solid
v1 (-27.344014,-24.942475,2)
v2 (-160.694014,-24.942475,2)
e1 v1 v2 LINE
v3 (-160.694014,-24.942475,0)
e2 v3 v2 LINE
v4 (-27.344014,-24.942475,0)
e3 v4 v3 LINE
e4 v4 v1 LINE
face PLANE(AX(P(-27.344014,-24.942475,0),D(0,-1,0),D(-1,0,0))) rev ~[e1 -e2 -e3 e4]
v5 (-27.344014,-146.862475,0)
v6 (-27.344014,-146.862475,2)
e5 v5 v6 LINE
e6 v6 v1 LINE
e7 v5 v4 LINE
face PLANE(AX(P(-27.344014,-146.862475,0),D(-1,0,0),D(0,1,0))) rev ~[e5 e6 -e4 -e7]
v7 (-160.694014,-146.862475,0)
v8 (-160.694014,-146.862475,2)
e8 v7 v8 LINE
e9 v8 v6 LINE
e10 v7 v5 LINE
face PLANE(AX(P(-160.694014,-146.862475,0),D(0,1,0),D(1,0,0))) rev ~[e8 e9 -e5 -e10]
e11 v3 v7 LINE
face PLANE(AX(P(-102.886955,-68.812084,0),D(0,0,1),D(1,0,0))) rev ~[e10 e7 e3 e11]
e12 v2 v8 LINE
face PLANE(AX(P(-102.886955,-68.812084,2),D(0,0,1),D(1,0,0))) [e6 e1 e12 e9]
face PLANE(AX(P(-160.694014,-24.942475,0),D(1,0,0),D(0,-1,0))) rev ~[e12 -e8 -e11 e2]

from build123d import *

# Parameters (mm, degrees)
F0_W     = 15
F0_H     = 10
F1_DEPTH = 2


with BuildPart() as f1:
    # F0 (on Top) → F1 (new body)
    with BuildSketch(Plane.XY):
        with BuildLine():
            Line((-79.005146173, -24.942474779), (-129.3440142274, -24.942474779))
            Line((-129.3440142274, -24.942474779), (-129.3440142274, -27.456315279))
            Line((-129.3440142274, -27.456315279), (-128.3440142274, -27.456315279))
            ThreePointArc((-128.3440142274, -27.456315279), (-126.3440142274, -25.456315279), (-124.3440142274, -27.456315279))
            ThreePointArc((-124.3440142274, -27.456315279), (-124.929800665, -28.8705288414), (-126.3440142274, -29.456315279))
            Line((-126.3440142274, -29.456315279), (-126.3440142274, -106.756315279))
            ThreePointArc((-126.3440142274, -106.756315279), (-124.929800665, -107.3421017166), (-124.3440142274, -108.756315279))
            ThreePointArc((-124.3440142274, -108.756315279), (-124.929800665, -110.1705288414), (-126.3440142274, -110.756315279))
            Line((-126.3440142274, -110.756315279), (-126.3440142274, -114.756315279))
            Line((-126.3440142274, -114.756315279), (-77.3440142274, -114.756315279))
            Line((-77.3440142274, -114.756315279), (-77.3440142274, -105.156315279))
            ThreePointArc((-77.3440142274, -105.156315279), (-79.3440142274, -103.156315279), (-77.3440142274, -101.156315279))
            Line((-77.3440142274, -101.156315279), (-77.3440142274, -28.056315279))
            ThreePointArc((-77.3440142274, -28.056315279), (-79.1086219742, -26.9976757307), (-79.005146173, -24.942474779))
        make_face()
        Polygon((-129.3440142274, -27.456315279), (-129.3440142274, -24.942474779), (-139.4949736476, -24.942474779), (-139.4949736476, -128.856315279), (-139.4949736476, -132.256315279), (-139.3440142274, -142.256315279), (-129.3440142274, -142.256315279), (-129.3440142274, -124.756315279), (-134.3440142274, -124.756315279), (-139.1930548072, -124.756315279), (-139.3440142274, -124.756315279), (-139.3440142274, -119.756315279), (-139.3440142274, -114.756315279), (-129.3440142274, -114.756315279), (-129.3440142274, -111.756315279), (-129.3440142274, -108.756315279), (-129.3440142274, -27.956315279), align=None)
        with BuildLine():
            Line((-139.4949736476, -128.856315279), (-139.4949736476, -24.942474779))
            Line((-139.4949736476, -24.942474779), (-160.6940142274, -24.942474779))
            Line((-160.6940142274, -24.942474779), (-160.6940142274, -132.256315279))
            Line((-160.6940142274, -132.256315279), (-142.7440142274, -132.256315279))
            Line((-142.7440142274, -132.256315279), (-142.7440142274, -130.256315279))
            ThreePointArc((-142.7440142274, -130.256315279), (-143.7339637211, -127.8663657853), (-141.3440142274, -128.856315279))
            Line((-141.3440142274, -128.856315279), (-139.4949736476, -128.856315279))
        make_face()
        with BuildLine():
            Line((-128.3440142274, -27.456315279), (-129.3440142274, -27.456315279))
            Line((-129.3440142274, -27.456315279), (-129.3440142274, -27.956315279))
            Line((-129.3440142274, -27.956315279), (-129.3440142274, -108.756315279))
            Line((-129.3440142274, -108.756315279), (-128.3440142274, -108.756315279))
            ThreePointArc((-128.3440142274, -108.756315279), (-127.7582277898, -107.3421017166), (-126.3440142274, -106.756315279))
            Line((-126.3440142274, -106.756315279), (-126.3440142274, -29.456315279))
            ThreePointArc((-126.3440142274, -29.456315279), (-127.7582277898, -28.8705288414), (-128.3440142274, -27.456315279))
        make_face()
        with BuildLine():
            Line((-75.6828822818, -24.942474779), (-79.005146173, -24.942474779))
            ThreePointArc((-79.005146173, -24.942474779), (-79.1086219742, -26.9976757307), (-77.3440142274, -28.056315279))
            Line((-77.3440142274, -28.056315279), (-77.3440142274, -26.056315279))
            Line((-77.3440142274, -26.056315279), (-75.3440142274, -26.056315279))
            ThreePointArc((-75.3440142274, -26.056315279), (-75.4306057646, -25.4741915341), (-75.6828822818, -24.942474779))
        make_face()
        with BuildLine():
            Line((-139.4949736476, -132.256315279), (-139.4949736476, -128.856315279))
            Line((-139.4949736476, -128.856315279), (-141.3440142274, -128.856315279))
            ThreePointArc((-141.3440142274, -128.856315279), (-141.7540647337, -129.8462647727), (-142.7440142274, -130.256315279))
            Line((-142.7440142274, -130.256315279), (-142.7440142274, -132.256315279))
            Line((-142.7440142274, -132.256315279), (-139.4949736476, -132.256315279))
        make_face()
        Polygon((-142.7440142274, -132.256315279), (-160.6940142274, -132.256315279), (-160.6940142274, -142.256315279), (-139.3440142274, -142.256315279), (-139.4949736476, -132.256315279), align=None)
        Polygon((-139.3440142274, -142.256315279), (-160.6940142274, -142.256315279), (-160.6940142274, -146.862474779), (-27.3440142274, -146.862474779), (-27.3440142274, -124.756315279), (-32.3440142274, -124.756315279), (-37.3440142274, -124.756315279), (-74.3440142274, -124.756315279), (-74.3440142274, -142.256315279), (-77.3440142274, -142.256315279), (-129.3440142274, -142.256315279), align=None)
        with BuildLine():
            ThreePointArc((-124.3440142274, -27.456315279), (-126.3440142274, -25.456315279), (-128.3440142274, -27.456315279))
            Line((-128.3440142274, -27.456315279), (-126.3440142274, -27.456315279))
            Line((-126.3440142274, -27.456315279), (-126.3440142274, -29.456315279))
            ThreePointArc((-126.3440142274, -29.456315279), (-124.929800665, -28.8705288414), (-124.3440142274, -27.456315279))
        make_face()
        with BuildLine():
            Line((-126.3440142274, -27.456315279), (-128.3440142274, -27.456315279))
            ThreePointArc((-128.3440142274, -27.456315279), (-127.7582277898, -28.8705288414), (-126.3440142274, -29.456315279))
            Line((-126.3440142274, -29.456315279), (-126.3440142274, -27.456315279))
        make_face()
        with BuildLine():
            Line((-74.3440142274, -24.942474779), (-75.6828822818, -24.942474779))
            ThreePointArc((-75.6828822818, -24.942474779), (-75.4306057646, -25.4741915341), (-75.3440142274, -26.056315279))
            Line((-75.3440142274, -26.056315279), (-74.3440142274, -26.056315279))
            Line((-74.3440142274, -26.056315279), (-74.3440142274, -24.942474779))
        make_face()
        with BuildLine():
            ThreePointArc((-75.3440142274, -26.056315279), (-75.929800665, -27.4705288414), (-77.3440142274, -28.056315279))
            Line((-77.3440142274, -28.056315279), (-77.3440142274, -101.156315279))
            ThreePointArc((-77.3440142274, -101.156315279), (-75.929800665, -101.7421017166), (-75.3440142274, -103.156315279))
            Line((-75.3440142274, -103.156315279), (-74.3440142274, -103.156315279))
            Line((-74.3440142274, -103.156315279), (-74.3440142274, -26.056315279))
            Line((-74.3440142274, -26.056315279), (-75.3440142274, -26.056315279))
        make_face()
        with BuildLine():
            Line((-77.3440142274, -26.056315279), (-77.3440142274, -28.056315279))
            ThreePointArc((-77.3440142274, -28.056315279), (-75.929800665, -27.4705288414), (-75.3440142274, -26.056315279))
            Line((-75.3440142274, -26.056315279), (-77.3440142274, -26.056315279))
        make_face()
        with BuildLine():
            Line((-142.7440142274, -128.856315279), (-141.3440142274, -128.856315279))
            ThreePointArc((-141.3440142274, -128.856315279), (-143.7339637211, -127.8663657853), (-142.7440142274, -130.256315279))
            Line((-142.7440142274, -130.256315279), (-142.7440142274, -128.856315279))
        make_face()
        with BuildLine():
            ThreePointArc((-142.7440142274, -130.256315279), (-141.7540647337, -129.8462647727), (-141.3440142274, -128.856315279))
            Line((-141.3440142274, -128.856315279), (-142.7440142274, -128.856315279))
            Line((-142.7440142274, -128.856315279), (-142.7440142274, -130.256315279))
        make_face()
        with BuildLine():
            Line((-128.3440142274, -108.756315279), (-129.3440142274, -108.756315279))
            Line((-129.3440142274, -108.756315279), (-129.3440142274, -111.756315279))
            Line((-129.3440142274, -111.756315279), (-129.3440142274, -114.756315279))
            Line((-129.3440142274, -114.756315279), (-126.3440142274, -114.756315279))
            Line((-126.3440142274, -114.756315279), (-126.3440142274, -110.756315279))
            ThreePointArc((-126.3440142274, -110.756315279), (-127.7582277898, -110.1705288414), (-128.3440142274, -108.756315279))
        make_face()
        Polygon((-64.3440142274, -24.942474779), (-74.3440142274, -24.942474779), (-74.3440142274, -26.056315279), (-74.3440142274, -103.156315279), (-74.3440142274, -111.906315279), (-74.3440142274, -114.756315279), (-64.3440142274, -114.756315279), (-64.3440142274, -112.806315279), (-64.3440142274, -82.706315279), (-64.3440142274, -80.756315279), (-64.3440142274, -60.756315279), (-64.3440142274, -59.006315279), (-64.3440142274, -26.456315279), align=None)
        with BuildLine():
            ThreePointArc((-75.3440142274, -103.156315279), (-75.929800665, -101.7421017166), (-77.3440142274, -101.156315279))
            Line((-77.3440142274, -101.156315279), (-77.3440142274, -103.156315279))
            Line((-77.3440142274, -103.156315279), (-75.3440142274, -103.156315279))
        make_face()
        with BuildLine():
            Line((-77.3440142274, -103.156315279), (-77.3440142274, -101.156315279))
            ThreePointArc((-77.3440142274, -101.156315279), (-79.3440142274, -103.156315279), (-77.3440142274, -105.156315279))
            Line((-77.3440142274, -105.156315279), (-77.3440142274, -103.156315279))
        make_face()
        Polygon((-129.3440142274, -124.756315279), (-129.3440142274, -142.256315279), (-77.3440142274, -142.256315279), (-74.3440142274, -142.256315279), (-74.3440142274, -124.756315279), align=None)
        with BuildLine():
            ThreePointArc((-126.3440142274, -106.756315279), (-127.7582277898, -107.3421017166), (-128.3440142274, -108.756315279))
            Line((-128.3440142274, -108.756315279), (-126.3440142274, -108.756315279))
            Line((-126.3440142274, -108.756315279), (-126.3440142274, -106.756315279))
        make_face()
        with BuildLine():
            Line((-126.3440142274, -108.756315279), (-128.3440142274, -108.756315279))
            ThreePointArc((-128.3440142274, -108.756315279), (-127.7582277898, -110.1705288414), (-126.3440142274, -110.756315279))
            Line((-126.3440142274, -110.756315279), (-126.3440142274, -108.756315279))
        make_face()
        with BuildLine():
            ThreePointArc((-124.3440142274, -108.756315279), (-124.929800665, -107.3421017166), (-126.3440142274, -106.756315279))
            Line((-126.3440142274, -106.756315279), (-126.3440142274, -108.756315279))
            Line((-126.3440142274, -108.756315279), (-126.3440142274, -110.756315279))
            ThreePointArc((-126.3440142274, -110.756315279), (-124.929800665, -110.1705288414), (-124.3440142274, -108.756315279))
        make_face()
        with BuildLine():
            Line((-62.6440142274, -24.942474779), (-64.3440142274, -24.942474779))
            Line((-64.3440142274, -24.942474779), (-64.3440142274, -26.456315279))
            Line((-64.3440142274, -26.456315279), (-63.8440142274, -26.456315279))
            ThreePointArc((-63.8440142274, -26.456315279), (-63.4925423648, -25.6077871416), (-62.6440142274, -25.256315279))
            Line((-62.6440142274, -25.256315279), (-62.6440142274, -24.942474779))
        make_face()
        with BuildLine():
            Line((-75.3440142274, -103.156315279), (-77.3440142274, -103.156315279))
            Line((-77.3440142274, -103.156315279), (-77.3440142274, -105.156315279))
            ThreePointArc((-77.3440142274, -105.156315279), (-75.929800665, -104.5705288414), (-75.3440142274, -103.156315279))
        make_face()
        with BuildLine():
            Line((-74.3440142274, -103.156315279), (-75.3440142274, -103.156315279))
            ThreePointArc((-75.3440142274, -103.156315279), (-75.929800665, -104.5705288414), (-77.3440142274, -105.156315279))
            Line((-77.3440142274, -105.156315279), (-77.3440142274, -114.756315279))
            Line((-77.3440142274, -114.756315279), (-77.1940142274, -114.756315279))
            Line((-77.1940142274, -114.756315279), (-74.3440142274, -114.756315279))
            Line((-74.3440142274, -114.756315279), (-74.3440142274, -111.906315279))
            Line((-74.3440142274, -111.906315279), (-74.3440142274, -103.156315279))
        make_face()
        with BuildLine():
            Line((-134.3440142274, -124.756315279), (-129.3440142274, -124.756315279))
            Line((-129.3440142274, -124.756315279), (-129.3440142274, -114.756315279))
            Line((-129.3440142274, -114.756315279), (-139.3440142274, -114.756315279))
            Line((-139.3440142274, -114.756315279), (-139.3440142274, -119.756315279))
            Line((-139.3440142274, -119.756315279), (-136.3440142274, -119.756315279))
            ThreePointArc((-136.3440142274, -119.756315279), (-134.3440142274, -117.756315279), (-132.3440142274, -119.756315279))
            ThreePointArc((-132.3440142274, -119.756315279), (-132.929800665, -121.1705288414), (-134.3440142274, -121.756315279))
            Line((-134.3440142274, -121.756315279), (-134.3440142274, -124.756315279))
        make_face()
        Polygon((-129.3440142274, -114.756315279), (-129.3440142274, -124.756315279), (-74.3440142274, -124.756315279), (-74.3440142274, -114.756315279), (-77.1940142274, -114.756315279), (-77.3440142274, -114.756315279), (-126.3440142274, -114.756315279), align=None)
        with BuildLine():
            Line((-32.3440142274, -124.756315279), (-27.3440142274, -124.756315279))
            Line((-27.3440142274, -124.756315279), (-27.3440142274, -114.756315279))
            Line((-27.3440142274, -114.756315279), (-37.3440142274, -114.756315279))
            Line((-37.3440142274, -114.756315279), (-37.3440142274, -119.756315279))
            Line((-37.3440142274, -119.756315279), (-34.3440142274, -119.756315279))
            ThreePointArc((-34.3440142274, -119.756315279), (-32.3440142274, -117.756315279), (-30.3440142274, -119.756315279))
            ThreePointArc((-30.3440142274, -119.756315279), (-30.929800665, -121.1705288414), (-32.3440142274, -121.756315279))
            Line((-32.3440142274, -121.756315279), (-32.3440142274, -124.756315279))
        make_face()
        with BuildLine():
            Line((-63.8440142274, -26.456315279), (-64.3440142274, -26.456315279))
            Line((-64.3440142274, -26.456315279), (-64.3440142274, -59.006315279))
            Line((-64.3440142274, -59.006315279), (-64.3440142274, -60.756315279))
            Line((-64.3440142274, -60.756315279), (-62.5940142274, -60.756315279))
            Line((-62.5940142274, -60.756315279), (-39.5940142274, -60.756315279))
            Line((-39.5940142274, -60.756315279), (-37.8440142274, -60.756315279))
            Line((-37.8440142274, -60.756315279), (-37.8440142274, -59.006315279))
            Line((-37.8440142274, -59.006315279), (-37.8440142274, -26.456315279))
            Line((-37.8440142274, -26.456315279), (-38.3440142274, -26.456315279))
            ThreePointArc((-38.3440142274, -26.456315279), (-40.3925423648, -27.3048434164), (-39.5440142274, -25.256315279))
            Line((-39.5440142274, -25.256315279), (-39.5440142274, -24.942474779))
            Line((-39.5440142274, -24.942474779), (-62.6440142274, -24.942474779))
            Line((-62.6440142274, -24.942474779), (-62.6440142274, -25.256315279))
            ThreePointArc((-62.6440142274, -25.256315279), (-61.79548609, -25.6077871416), (-61.4440142274, -26.456315279))
            ThreePointArc((-61.4440142274, -26.456315279), (-62.6440142274, -27.656315279), (-63.8440142274, -26.456315279))
        make_face()
        Polygon((-27.3440142274, -114.756315279), (-27.3440142274, -24.942474779), (-37.8440142274, -24.942474779), (-37.8440142274, -26.456315279), (-37.8440142274, -59.006315279), (-37.8440142274, -60.756315279), (-39.5940142274, -60.756315279), (-62.5940142274, -60.756315279), (-64.3440142274, -60.756315279), (-64.3440142274, -80.756315279), (-62.3940142274, -80.756315279), (-57.3440142274, -80.756315279), (-57.3440142274, -70.756315279), (-42.3440142274, -70.756315279), (-42.3440142274, -80.756315279), (-39.2940142274, -80.756315279), (-37.3440142274, -80.756315279), (-37.3440142274, -82.706315279), (-37.3440142274, -112.806315279), (-37.3440142274, -114.756315279), align=None)
        with BuildLine():
            Line((-139.1930548072, -124.756315279), (-134.3440142274, -124.756315279))
            Line((-134.3440142274, -124.756315279), (-134.3440142274, -121.756315279))
            ThreePointArc((-134.3440142274, -121.756315279), (-135.7582277898, -121.1705288414), (-136.3440142274, -119.756315279))
            Line((-136.3440142274, -119.756315279), (-139.3440142274, -119.756315279))
            Line((-139.3440142274, -119.756315279), (-139.3440142274, -124.756315279))
            Line((-139.3440142274, -124.756315279), (-139.1930548072, -124.756315279))
        make_face()
        Polygon((-74.3440142274, -114.756315279), (-74.3440142274, -124.756315279), (-37.3440142274, -124.756315279), (-37.3440142274, -119.756315279), (-37.3440142274, -114.756315279), (-39.2940142274, -114.756315279), (-62.3940142274, -114.756315279), (-64.3440142274, -114.756315279), align=None)
        with BuildLine():
            Line((-37.3440142274, -124.756315279), (-32.3440142274, -124.756315279))
            Line((-32.3440142274, -124.756315279), (-32.3440142274, -121.756315279))
            ThreePointArc((-32.3440142274, -121.756315279), (-33.7582277898, -121.1705288414), (-34.3440142274, -119.756315279))
            Line((-34.3440142274, -119.756315279), (-37.3440142274, -119.756315279))
            Line((-37.3440142274, -119.756315279), (-37.3440142274, -124.756315279))
        make_face()
        with BuildLine():
            ThreePointArc((-62.6440142274, -25.256315279), (-63.4925423648, -25.6077871416), (-63.8440142274, -26.456315279))
            Line((-63.8440142274, -26.456315279), (-62.6440142274, -26.456315279))
            Line((-62.6440142274, -26.456315279), (-62.6440142274, -25.256315279))
        make_face()
        with BuildLine():
            Line((-62.6440142274, -26.456315279), (-63.8440142274, -26.456315279))
            ThreePointArc((-63.8440142274, -26.456315279), (-62.6440142274, -27.656315279), (-61.4440142274, -26.456315279))
            ThreePointArc((-61.4440142274, -26.456315279), (-61.79548609, -25.6077871416), (-62.6440142274, -25.256315279))
            Line((-62.6440142274, -25.256315279), (-62.6440142274, -26.456315279))
        make_face()
        with BuildLine():
            Line((-37.8440142274, -24.942474779), (-39.5440142274, -24.942474779))
            Line((-39.5440142274, -24.942474779), (-39.5440142274, -25.256315279))
            ThreePointArc((-39.5440142274, -25.256315279), (-38.69548609, -25.6077871416), (-38.3440142274, -26.456315279))
            Line((-38.3440142274, -26.456315279), (-37.8440142274, -26.456315279))
            Line((-37.8440142274, -26.456315279), (-37.8440142274, -24.942474779))
        make_face()
        with BuildLine():
            ThreePointArc((-136.3440142274, -119.756315279), (-135.7582277898, -121.1705288414), (-134.3440142274, -121.756315279))
            Line((-134.3440142274, -121.756315279), (-134.3440142274, -119.756315279))
            Line((-134.3440142274, -119.756315279), (-136.3440142274, -119.756315279))
        make_face()
        with BuildLine():
            Line((-134.3440142274, -119.756315279), (-134.3440142274, -121.756315279))
            ThreePointArc((-134.3440142274, -121.756315279), (-132.929800665, -121.1705288414), (-132.3440142274, -119.756315279))
            ThreePointArc((-132.3440142274, -119.756315279), (-134.3440142274, -117.756315279), (-136.3440142274, -119.756315279))
            Line((-136.3440142274, -119.756315279), (-134.3440142274, -119.756315279))
        make_face()
        with BuildLine():
            ThreePointArc((-34.3440142274, -119.756315279), (-33.7582277898, -121.1705288414), (-32.3440142274, -121.756315279))
            Line((-32.3440142274, -121.756315279), (-32.3440142274, -119.756315279))
            Line((-32.3440142274, -119.756315279), (-34.3440142274, -119.756315279))
        make_face()
        with BuildLine():
            Line((-32.3440142274, -119.756315279), (-32.3440142274, -121.756315279))
            ThreePointArc((-32.3440142274, -121.756315279), (-30.929800665, -121.1705288414), (-30.3440142274, -119.756315279))
            ThreePointArc((-30.3440142274, -119.756315279), (-32.3440142274, -117.756315279), (-34.3440142274, -119.756315279))
            Line((-34.3440142274, -119.756315279), (-32.3440142274, -119.756315279))
        make_face()
        with BuildLine():
            Line((-39.2940142274, -114.756315279), (-37.3440142274, -114.756315279))
            Line((-37.3440142274, -114.756315279), (-37.3440142274, -112.806315279))
            Line((-37.3440142274, -112.806315279), (-38.1440142274, -112.806315279))
            ThreePointArc((-38.1440142274, -112.806315279), (-38.480841429, -113.6194880774), (-39.2940142274, -113.956315279))
            Line((-39.2940142274, -113.956315279), (-39.2940142274, -114.756315279))
        make_face()
        with BuildLine():
            ThreePointArc((-38.3440142274, -26.456315279), (-38.69548609, -25.6077871416), (-39.5440142274, -25.256315279))
            Line((-39.5440142274, -25.256315279), (-39.5440142274, -26.456315279))
            Line((-39.5440142274, -26.456315279), (-38.3440142274, -26.456315279))
        make_face()
        with BuildLine():
            Line((-39.5440142274, -26.456315279), (-39.5440142274, -25.256315279))
            ThreePointArc((-39.5440142274, -25.256315279), (-40.3925423648, -27.3048434164), (-38.3440142274, -26.456315279))
            Line((-38.3440142274, -26.456315279), (-39.5440142274, -26.456315279))
        make_face()
        with BuildLine():
            Line((-64.3440142274, -112.806315279), (-64.3440142274, -114.756315279))
            Line((-64.3440142274, -114.756315279), (-62.3940142274, -114.756315279))
            Line((-62.3940142274, -114.756315279), (-62.3940142274, -113.956315279))
            ThreePointArc((-62.3940142274, -113.956315279), (-63.2071870258, -113.6194880774), (-63.5440142274, -112.806315279))
            Line((-63.5440142274, -112.806315279), (-64.3440142274, -112.806315279))
        make_face()
        with BuildLine():
            Line((-62.3940142274, -114.756315279), (-39.2940142274, -114.756315279))
            Line((-39.2940142274, -114.756315279), (-39.2940142274, -113.956315279))
            ThreePointArc((-39.2940142274, -113.956315279), (-40.1071870258, -111.9931424806), (-38.1440142274, -112.806315279))
            Line((-38.1440142274, -112.806315279), (-37.3440142274, -112.806315279))
            Line((-37.3440142274, -112.806315279), (-37.3440142274, -82.706315279))
            Line((-37.3440142274, -82.706315279), (-38.1440142274, -82.706315279))
            ThreePointArc((-38.1440142274, -82.706315279), (-40.1071870258, -83.5194880774), (-39.2940142274, -81.556315279))
            Line((-39.2940142274, -81.556315279), (-39.2940142274, -80.756315279))
            Line((-39.2940142274, -80.756315279), (-42.3440142274, -80.756315279))
            Line((-42.3440142274, -80.756315279), (-57.3440142274, -80.756315279))
            Line((-57.3440142274, -80.756315279), (-62.3940142274, -80.756315279))
            Line((-62.3940142274, -80.756315279), (-62.3940142274, -81.556315279))
            ThreePointArc((-62.3940142274, -81.556315279), (-61.580841429, -81.8931424806), (-61.2440142274, -82.706315279))
            ThreePointArc((-61.2440142274, -82.706315279), (-62.3940142274, -83.856315279), (-63.5440142274, -82.706315279))
            Line((-63.5440142274, -82.706315279), (-64.3440142274, -82.706315279))
            Line((-64.3440142274, -82.706315279), (-64.3440142274, -112.806315279))
            Line((-64.3440142274, -112.806315279), (-63.5440142274, -112.806315279))
            ThreePointArc((-63.5440142274, -112.806315279), (-62.3940142274, -111.656315279), (-61.2440142274, -112.806315279))
            ThreePointArc((-61.2440142274, -112.806315279), (-61.580841429, -113.6194880774), (-62.3940142274, -113.956315279))
            Line((-62.3940142274, -113.956315279), (-62.3940142274, -114.756315279))
        make_face()
        with BuildLine():
            Line((-62.3940142274, -80.756315279), (-64.3440142274, -80.756315279))
            Line((-64.3440142274, -80.756315279), (-64.3440142274, -82.706315279))
            Line((-64.3440142274, -82.706315279), (-63.5440142274, -82.706315279))
            ThreePointArc((-63.5440142274, -82.706315279), (-63.2071870258, -81.8931424806), (-62.3940142274, -81.556315279))
            Line((-62.3940142274, -81.556315279), (-62.3940142274, -80.756315279))
        make_face()
        with BuildLine():
            ThreePointArc((-38.1440142274, -112.806315279), (-40.1071870258, -111.9931424806), (-39.2940142274, -113.956315279))
            Line((-39.2940142274, -113.956315279), (-39.2940142274, -112.806315279))
            Line((-39.2940142274, -112.806315279), (-38.1440142274, -112.806315279))
        make_face()
        with BuildLine():
            Line((-39.2940142274, -112.806315279), (-39.2940142274, -113.956315279))
            ThreePointArc((-39.2940142274, -113.956315279), (-38.480841429, -113.6194880774), (-38.1440142274, -112.806315279))
            Line((-38.1440142274, -112.806315279), (-39.2940142274, -112.806315279))
        make_face()
        with BuildLine():
            Line((-38.1440142274, -82.706315279), (-37.3440142274, -82.706315279))
            Line((-37.3440142274, -82.706315279), (-37.3440142274, -80.756315279))
            Line((-37.3440142274, -80.756315279), (-39.2940142274, -80.756315279))
            Line((-39.2940142274, -80.756315279), (-39.2940142274, -81.556315279))
            ThreePointArc((-39.2940142274, -81.556315279), (-38.480841429, -81.8931424806), (-38.1440142274, -82.706315279))
        make_face()
        with BuildLine():
            ThreePointArc((-63.5440142274, -112.806315279), (-63.2071870258, -113.6194880774), (-62.3940142274, -113.956315279))
            Line((-62.3940142274, -113.956315279), (-62.3940142274, -112.806315279))
            Line((-62.3940142274, -112.806315279), (-63.5440142274, -112.806315279))
        make_face()
        with BuildLine():
            Line((-62.3940142274, -112.806315279), (-62.3940142274, -113.956315279))
            ThreePointArc((-62.3940142274, -113.956315279), (-61.580841429, -113.6194880774), (-61.2440142274, -112.806315279))
            ThreePointArc((-61.2440142274, -112.806315279), (-62.3940142274, -111.656315279), (-63.5440142274, -112.806315279))
            Line((-63.5440142274, -112.806315279), (-62.3940142274, -112.806315279))
        make_face()
        with BuildLine():
            ThreePointArc((-39.2940142274, -81.556315279), (-40.1071870258, -83.5194880774), (-38.1440142274, -82.706315279))
            Line((-38.1440142274, -82.706315279), (-39.2940142274, -82.706315279))
            Line((-39.2940142274, -82.706315279), (-39.2940142274, -81.556315279))
        make_face()
        with BuildLine():
            Line((-39.2940142274, -82.706315279), (-38.1440142274, -82.706315279))
            ThreePointArc((-38.1440142274, -82.706315279), (-38.480841429, -81.8931424806), (-39.2940142274, -81.556315279))
            Line((-39.2940142274, -81.556315279), (-39.2940142274, -82.706315279))
        make_face()
        with Locations((-49.8440142274, -75.756315279)):
            Rectangle(F0_W, F0_H)
        with BuildLine():
            ThreePointArc((-61.2440142274, -82.706315279), (-61.580841429, -81.8931424806), (-62.3940142274, -81.556315279))
            Line((-62.3940142274, -81.556315279), (-62.3940142274, -82.706315279))
            Line((-62.3940142274, -82.706315279), (-63.5440142274, -82.706315279))
            ThreePointArc((-63.5440142274, -82.706315279), (-62.3940142274, -83.856315279), (-61.2440142274, -82.706315279))
        make_face()
        with BuildLine():
            Line((-62.3940142274, -82.706315279), (-62.3940142274, -81.556315279))
            ThreePointArc((-62.3940142274, -81.556315279), (-63.2071870258, -81.8931424806), (-63.5440142274, -82.706315279))
            Line((-63.5440142274, -82.706315279), (-62.3940142274, -82.706315279))
        make_face()
    extrude(amount=F1_DEPTH)


solid = f1.part
